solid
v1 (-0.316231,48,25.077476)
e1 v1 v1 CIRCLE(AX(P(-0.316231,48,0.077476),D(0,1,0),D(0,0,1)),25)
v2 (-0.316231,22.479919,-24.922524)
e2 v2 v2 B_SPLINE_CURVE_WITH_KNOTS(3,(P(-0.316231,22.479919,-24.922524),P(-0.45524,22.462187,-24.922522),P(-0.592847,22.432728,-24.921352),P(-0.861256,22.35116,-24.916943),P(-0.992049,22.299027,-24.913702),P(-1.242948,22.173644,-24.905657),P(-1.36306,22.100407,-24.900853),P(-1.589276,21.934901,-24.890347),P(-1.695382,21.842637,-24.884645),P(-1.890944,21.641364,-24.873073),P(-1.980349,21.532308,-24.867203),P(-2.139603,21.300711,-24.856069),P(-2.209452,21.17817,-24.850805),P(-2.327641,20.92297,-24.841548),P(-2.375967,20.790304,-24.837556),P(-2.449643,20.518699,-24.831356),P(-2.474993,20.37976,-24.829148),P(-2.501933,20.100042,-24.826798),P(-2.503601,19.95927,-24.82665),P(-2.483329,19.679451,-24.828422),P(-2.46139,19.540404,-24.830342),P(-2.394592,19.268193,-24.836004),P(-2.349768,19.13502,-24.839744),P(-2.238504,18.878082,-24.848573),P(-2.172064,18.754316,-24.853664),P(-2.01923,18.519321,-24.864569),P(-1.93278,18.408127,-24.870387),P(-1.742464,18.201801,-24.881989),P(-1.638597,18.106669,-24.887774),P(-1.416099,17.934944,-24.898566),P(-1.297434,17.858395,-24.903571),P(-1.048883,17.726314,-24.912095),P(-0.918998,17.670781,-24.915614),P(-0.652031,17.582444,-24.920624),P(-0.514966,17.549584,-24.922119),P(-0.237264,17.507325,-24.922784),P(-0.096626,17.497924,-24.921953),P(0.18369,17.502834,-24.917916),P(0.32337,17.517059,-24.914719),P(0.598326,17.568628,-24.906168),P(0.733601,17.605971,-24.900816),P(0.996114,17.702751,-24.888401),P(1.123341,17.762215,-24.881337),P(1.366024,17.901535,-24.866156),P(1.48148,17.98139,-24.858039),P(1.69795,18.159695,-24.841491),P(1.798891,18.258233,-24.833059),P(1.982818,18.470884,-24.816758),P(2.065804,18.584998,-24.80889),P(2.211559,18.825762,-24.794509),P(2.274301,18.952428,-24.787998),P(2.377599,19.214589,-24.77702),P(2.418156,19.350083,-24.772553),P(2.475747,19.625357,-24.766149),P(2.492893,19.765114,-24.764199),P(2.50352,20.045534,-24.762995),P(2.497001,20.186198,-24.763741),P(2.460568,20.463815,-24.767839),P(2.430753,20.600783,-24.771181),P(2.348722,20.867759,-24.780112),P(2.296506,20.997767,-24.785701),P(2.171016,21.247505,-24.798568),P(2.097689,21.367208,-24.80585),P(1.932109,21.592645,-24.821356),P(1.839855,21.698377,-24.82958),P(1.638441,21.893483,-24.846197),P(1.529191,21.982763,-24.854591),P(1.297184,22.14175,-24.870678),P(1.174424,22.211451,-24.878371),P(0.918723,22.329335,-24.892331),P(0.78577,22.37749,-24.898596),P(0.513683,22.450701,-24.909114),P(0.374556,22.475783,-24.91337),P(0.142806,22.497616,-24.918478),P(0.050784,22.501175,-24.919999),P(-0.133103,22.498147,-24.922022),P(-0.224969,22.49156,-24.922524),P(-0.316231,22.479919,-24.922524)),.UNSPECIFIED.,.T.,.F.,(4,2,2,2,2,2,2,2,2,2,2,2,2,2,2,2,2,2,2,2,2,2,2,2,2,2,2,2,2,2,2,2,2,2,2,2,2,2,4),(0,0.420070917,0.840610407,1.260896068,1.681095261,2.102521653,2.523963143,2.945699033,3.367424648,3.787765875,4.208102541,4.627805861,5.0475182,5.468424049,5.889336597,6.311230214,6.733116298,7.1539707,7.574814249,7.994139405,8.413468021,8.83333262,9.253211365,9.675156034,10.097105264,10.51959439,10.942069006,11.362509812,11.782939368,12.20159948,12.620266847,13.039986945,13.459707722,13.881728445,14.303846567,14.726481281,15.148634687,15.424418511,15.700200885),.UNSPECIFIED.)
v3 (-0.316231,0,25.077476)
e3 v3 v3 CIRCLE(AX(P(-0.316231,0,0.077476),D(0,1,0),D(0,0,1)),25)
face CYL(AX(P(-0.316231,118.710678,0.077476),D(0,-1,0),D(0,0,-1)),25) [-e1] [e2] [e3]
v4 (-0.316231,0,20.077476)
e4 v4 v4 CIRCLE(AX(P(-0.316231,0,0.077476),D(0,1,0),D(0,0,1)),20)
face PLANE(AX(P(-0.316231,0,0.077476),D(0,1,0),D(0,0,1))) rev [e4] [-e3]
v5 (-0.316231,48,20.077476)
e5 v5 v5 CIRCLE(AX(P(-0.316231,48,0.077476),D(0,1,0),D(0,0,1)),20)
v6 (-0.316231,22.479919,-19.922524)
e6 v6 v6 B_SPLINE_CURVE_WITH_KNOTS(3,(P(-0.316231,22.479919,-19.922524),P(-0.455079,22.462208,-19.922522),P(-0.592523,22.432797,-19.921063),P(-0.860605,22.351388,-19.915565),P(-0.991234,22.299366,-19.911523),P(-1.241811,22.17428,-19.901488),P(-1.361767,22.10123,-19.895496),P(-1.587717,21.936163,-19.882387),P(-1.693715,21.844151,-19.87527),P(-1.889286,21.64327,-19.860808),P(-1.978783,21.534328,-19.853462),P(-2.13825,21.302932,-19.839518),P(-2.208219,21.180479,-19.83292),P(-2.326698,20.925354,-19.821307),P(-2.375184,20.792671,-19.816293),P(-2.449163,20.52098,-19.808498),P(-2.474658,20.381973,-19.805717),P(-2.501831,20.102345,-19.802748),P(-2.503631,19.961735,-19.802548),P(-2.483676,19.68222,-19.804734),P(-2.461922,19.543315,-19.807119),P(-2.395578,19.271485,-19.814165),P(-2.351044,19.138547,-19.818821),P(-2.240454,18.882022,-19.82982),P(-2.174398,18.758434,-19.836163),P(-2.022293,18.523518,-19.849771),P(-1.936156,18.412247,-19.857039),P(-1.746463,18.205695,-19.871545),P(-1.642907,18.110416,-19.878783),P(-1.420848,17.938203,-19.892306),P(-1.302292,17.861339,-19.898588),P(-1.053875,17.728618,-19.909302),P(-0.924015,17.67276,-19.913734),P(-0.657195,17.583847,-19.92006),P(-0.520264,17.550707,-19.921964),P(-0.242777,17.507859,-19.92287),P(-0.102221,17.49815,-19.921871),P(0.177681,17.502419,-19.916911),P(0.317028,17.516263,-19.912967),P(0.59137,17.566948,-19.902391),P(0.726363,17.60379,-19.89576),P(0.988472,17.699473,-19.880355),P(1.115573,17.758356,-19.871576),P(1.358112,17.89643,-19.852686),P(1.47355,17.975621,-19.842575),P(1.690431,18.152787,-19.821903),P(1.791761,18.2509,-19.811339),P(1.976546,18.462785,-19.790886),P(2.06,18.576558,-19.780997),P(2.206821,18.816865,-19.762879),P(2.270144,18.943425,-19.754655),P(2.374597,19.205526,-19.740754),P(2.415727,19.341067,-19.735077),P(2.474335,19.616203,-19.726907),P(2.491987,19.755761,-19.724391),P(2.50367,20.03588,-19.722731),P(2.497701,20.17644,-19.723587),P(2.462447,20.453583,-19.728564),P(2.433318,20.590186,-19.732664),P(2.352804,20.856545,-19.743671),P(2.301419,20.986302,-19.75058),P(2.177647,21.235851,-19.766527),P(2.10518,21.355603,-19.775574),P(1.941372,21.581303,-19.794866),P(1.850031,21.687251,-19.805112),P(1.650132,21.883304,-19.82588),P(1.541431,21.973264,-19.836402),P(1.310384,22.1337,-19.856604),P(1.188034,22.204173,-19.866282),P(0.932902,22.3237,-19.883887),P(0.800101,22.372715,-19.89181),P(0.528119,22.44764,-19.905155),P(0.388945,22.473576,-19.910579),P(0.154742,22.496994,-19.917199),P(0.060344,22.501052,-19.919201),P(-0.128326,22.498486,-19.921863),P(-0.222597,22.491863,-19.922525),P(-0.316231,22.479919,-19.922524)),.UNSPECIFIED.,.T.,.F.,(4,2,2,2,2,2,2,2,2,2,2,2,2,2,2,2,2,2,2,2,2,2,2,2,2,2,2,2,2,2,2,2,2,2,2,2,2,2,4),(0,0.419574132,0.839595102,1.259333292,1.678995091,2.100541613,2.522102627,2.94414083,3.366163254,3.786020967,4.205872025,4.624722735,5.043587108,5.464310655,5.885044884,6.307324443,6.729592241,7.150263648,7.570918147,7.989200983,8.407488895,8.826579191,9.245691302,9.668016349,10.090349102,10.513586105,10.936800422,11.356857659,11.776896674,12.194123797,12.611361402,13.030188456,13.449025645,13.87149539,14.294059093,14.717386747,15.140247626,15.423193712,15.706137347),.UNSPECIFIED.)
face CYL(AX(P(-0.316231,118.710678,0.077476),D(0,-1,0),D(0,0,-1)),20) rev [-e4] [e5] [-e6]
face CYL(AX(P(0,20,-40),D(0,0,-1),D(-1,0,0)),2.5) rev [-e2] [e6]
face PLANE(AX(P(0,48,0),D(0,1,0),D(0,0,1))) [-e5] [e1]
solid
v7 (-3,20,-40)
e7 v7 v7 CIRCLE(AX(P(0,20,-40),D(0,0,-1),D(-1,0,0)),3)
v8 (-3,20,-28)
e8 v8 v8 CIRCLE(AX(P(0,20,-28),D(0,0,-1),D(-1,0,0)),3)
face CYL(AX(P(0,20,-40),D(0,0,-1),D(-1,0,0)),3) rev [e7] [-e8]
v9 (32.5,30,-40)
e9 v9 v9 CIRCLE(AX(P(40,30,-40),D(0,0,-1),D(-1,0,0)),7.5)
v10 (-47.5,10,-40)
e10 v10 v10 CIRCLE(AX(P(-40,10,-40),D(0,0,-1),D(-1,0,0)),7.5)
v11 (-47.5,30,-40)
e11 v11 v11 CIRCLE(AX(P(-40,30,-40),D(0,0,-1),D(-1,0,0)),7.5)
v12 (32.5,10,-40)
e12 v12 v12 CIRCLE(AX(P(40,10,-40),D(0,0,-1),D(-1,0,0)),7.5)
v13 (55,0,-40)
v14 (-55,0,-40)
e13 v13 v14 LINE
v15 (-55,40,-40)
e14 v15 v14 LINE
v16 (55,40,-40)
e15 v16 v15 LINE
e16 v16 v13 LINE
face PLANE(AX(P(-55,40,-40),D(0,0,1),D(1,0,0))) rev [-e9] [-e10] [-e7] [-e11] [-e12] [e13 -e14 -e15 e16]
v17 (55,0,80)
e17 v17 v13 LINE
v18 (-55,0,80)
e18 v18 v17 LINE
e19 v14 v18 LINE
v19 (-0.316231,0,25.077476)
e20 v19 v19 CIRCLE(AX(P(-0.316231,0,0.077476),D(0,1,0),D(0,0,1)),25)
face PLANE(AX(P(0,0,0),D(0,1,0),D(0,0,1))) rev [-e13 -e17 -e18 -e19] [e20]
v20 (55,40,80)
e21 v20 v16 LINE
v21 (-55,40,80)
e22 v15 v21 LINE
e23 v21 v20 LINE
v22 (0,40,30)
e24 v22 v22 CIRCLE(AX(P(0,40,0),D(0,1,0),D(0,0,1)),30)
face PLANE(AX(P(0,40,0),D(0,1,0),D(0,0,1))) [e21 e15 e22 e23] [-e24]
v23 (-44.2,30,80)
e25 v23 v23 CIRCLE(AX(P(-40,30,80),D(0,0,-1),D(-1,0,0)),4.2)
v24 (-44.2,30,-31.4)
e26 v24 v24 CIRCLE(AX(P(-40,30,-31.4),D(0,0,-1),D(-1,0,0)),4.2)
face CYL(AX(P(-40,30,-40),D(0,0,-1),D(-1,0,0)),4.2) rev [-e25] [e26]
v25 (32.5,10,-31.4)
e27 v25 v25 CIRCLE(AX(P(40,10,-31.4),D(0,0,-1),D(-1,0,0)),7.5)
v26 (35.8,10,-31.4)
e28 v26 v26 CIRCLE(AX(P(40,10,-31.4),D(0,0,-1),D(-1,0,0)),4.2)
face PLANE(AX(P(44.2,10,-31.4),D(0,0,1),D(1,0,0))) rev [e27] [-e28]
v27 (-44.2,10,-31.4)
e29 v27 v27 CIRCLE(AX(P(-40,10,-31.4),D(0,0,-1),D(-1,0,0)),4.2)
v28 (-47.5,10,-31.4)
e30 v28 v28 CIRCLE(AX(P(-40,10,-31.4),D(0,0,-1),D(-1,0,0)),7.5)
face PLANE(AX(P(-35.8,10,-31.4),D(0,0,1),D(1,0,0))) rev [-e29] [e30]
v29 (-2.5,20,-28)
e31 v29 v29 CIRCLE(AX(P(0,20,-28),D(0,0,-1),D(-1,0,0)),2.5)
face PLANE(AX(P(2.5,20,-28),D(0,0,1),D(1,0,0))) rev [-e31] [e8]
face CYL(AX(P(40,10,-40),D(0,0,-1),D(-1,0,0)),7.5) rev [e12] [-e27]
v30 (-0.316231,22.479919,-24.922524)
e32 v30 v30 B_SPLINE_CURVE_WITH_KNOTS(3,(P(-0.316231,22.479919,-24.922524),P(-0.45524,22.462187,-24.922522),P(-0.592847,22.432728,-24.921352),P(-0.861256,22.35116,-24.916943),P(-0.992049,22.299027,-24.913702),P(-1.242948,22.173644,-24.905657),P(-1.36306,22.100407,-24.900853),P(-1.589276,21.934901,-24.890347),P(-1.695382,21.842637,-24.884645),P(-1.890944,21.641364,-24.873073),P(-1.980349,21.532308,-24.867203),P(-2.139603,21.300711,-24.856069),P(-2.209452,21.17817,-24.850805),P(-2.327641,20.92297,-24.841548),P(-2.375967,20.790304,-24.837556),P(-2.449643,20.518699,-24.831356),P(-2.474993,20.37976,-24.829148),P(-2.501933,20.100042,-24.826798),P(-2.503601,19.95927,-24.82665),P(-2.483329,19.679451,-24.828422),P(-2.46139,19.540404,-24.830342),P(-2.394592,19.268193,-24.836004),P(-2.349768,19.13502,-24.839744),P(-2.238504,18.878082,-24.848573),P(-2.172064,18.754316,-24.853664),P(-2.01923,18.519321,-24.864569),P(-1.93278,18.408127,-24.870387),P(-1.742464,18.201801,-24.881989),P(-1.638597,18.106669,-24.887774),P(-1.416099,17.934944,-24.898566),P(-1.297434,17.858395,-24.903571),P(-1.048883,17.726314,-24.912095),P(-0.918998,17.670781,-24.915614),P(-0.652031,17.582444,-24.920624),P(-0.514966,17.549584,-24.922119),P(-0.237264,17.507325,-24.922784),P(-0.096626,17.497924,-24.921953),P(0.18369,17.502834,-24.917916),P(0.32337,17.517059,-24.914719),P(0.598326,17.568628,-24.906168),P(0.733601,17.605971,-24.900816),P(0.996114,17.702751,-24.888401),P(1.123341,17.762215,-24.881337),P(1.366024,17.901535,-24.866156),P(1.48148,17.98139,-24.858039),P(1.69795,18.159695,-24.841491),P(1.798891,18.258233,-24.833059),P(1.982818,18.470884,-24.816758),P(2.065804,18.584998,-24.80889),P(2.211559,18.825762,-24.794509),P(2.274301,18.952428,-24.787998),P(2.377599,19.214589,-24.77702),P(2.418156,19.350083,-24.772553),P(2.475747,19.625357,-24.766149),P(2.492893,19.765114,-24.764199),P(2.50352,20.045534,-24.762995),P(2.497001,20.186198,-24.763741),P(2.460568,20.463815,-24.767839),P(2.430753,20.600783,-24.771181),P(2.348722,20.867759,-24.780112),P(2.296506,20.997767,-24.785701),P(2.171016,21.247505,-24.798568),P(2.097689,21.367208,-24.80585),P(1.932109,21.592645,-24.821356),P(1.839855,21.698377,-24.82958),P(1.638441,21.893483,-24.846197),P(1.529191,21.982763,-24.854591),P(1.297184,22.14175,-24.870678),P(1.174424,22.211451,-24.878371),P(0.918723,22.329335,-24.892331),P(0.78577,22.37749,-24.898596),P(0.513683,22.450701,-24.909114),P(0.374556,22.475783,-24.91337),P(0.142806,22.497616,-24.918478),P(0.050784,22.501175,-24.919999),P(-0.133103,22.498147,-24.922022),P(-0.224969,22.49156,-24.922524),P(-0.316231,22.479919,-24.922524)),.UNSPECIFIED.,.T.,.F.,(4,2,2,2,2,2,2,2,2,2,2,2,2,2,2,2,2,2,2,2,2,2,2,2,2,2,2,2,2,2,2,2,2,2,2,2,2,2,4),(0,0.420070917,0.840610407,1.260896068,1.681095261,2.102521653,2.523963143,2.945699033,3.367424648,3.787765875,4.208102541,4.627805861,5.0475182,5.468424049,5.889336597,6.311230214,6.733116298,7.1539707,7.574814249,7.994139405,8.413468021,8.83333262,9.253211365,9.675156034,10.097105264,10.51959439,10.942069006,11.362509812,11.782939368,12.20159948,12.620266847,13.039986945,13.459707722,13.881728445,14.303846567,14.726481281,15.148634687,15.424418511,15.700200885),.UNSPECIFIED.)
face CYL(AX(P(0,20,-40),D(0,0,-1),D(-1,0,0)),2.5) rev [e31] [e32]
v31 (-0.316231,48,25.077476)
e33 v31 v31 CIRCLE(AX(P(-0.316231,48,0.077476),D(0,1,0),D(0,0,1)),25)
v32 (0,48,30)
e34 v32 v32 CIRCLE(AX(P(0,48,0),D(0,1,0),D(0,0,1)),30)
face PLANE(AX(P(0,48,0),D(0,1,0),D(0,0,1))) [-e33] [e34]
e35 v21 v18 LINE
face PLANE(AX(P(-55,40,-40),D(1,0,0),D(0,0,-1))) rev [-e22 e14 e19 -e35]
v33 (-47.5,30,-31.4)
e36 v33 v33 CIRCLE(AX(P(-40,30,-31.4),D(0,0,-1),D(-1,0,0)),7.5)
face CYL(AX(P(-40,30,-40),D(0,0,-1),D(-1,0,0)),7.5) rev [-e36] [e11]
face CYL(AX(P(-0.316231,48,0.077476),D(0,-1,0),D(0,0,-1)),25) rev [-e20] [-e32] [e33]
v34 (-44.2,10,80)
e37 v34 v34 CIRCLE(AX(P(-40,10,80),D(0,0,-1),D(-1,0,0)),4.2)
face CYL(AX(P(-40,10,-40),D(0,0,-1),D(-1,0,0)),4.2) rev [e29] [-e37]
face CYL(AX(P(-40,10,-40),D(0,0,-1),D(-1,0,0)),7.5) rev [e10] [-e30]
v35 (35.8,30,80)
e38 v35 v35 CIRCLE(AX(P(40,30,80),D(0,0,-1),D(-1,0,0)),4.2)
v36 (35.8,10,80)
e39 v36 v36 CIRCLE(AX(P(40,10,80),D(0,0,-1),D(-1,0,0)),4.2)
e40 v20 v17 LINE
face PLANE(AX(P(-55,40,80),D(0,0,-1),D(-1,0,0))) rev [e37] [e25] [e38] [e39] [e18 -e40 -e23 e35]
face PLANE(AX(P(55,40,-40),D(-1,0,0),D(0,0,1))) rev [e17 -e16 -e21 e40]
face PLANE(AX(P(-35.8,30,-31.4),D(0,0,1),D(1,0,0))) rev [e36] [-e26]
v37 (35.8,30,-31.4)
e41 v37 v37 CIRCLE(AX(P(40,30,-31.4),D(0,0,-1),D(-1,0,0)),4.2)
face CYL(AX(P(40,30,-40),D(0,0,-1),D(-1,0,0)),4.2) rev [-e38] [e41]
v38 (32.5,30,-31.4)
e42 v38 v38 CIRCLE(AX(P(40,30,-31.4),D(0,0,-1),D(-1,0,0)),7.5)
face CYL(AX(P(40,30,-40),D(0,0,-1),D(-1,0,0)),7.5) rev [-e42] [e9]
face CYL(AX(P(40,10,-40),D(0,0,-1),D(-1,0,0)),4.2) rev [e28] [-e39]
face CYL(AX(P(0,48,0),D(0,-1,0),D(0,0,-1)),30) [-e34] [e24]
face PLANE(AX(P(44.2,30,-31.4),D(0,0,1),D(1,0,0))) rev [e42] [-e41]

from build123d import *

# Parameters (mm, degrees)
SKETCH1_W                                     = 110
SKETCH1_H                                     = 120
GUIDE_BLOCK_DEPTH                             = 40
SKETCH2_R                                     = 30
SKETCH2_R_2                                   = 25
BUSH_BOSS_DEPTH                               = 8
SKETCH3_R                                     = 25
CUT_EXTRUDE1_DEPTH                            = 106
SKETCH8_R                                     = 25
SKETCH8_R_2                                   = 20
BOSS_EXTRUDE3_DEPTH                           = 48
CBORE_START                                   = -40
CBORE_FOR_M8_HEX_SOCKET_HEAD_CAP_SCR_2_R      = 4.2
CBORE_FOR_M8_HEX_SOCKET_HEAD_CAP_SCREW1_DEPTH = 120
CBORE_FOR_M8_HEX_SOCKET_HEAD_CAP_SCR_3_O_R    = 7.5
CBORE_FOR_M8_HEX_SOCKET_HEAD_CAP_SCR_3_O_R_2  = 4.2
CBORE_FOR_M8_HEX_SOCKET_HEAD_CAP_SCR_3_DEPTH  = 8.6


# Read off the part's stored shape, not the designer's step: M6 Tapped Hole1, CBORE for M8 Hex Socket Head Cap Screw1
with BuildPart() as part:
    # Sketch1 → GUIDE_BLOCK (new body)
    with BuildSketch(Plane(origin=(0, 0, 0), x_dir=(1, 0, 0), z_dir=(0, 1, 0))):
        with Locations((0, -20)):
            Rectangle(SKETCH1_W, SKETCH1_H)
    extrude(amount=GUIDE_BLOCK_DEPTH)

    # Sketch2 → BUSH_BOSS (add)
    with BuildSketch(Plane(origin=(0, 40, 0), x_dir=(1, 0, 0), z_dir=(0, 1, 0))):
        with Locations(Location((0, 0, 0), (0, 0, 270))):
            Circle(SKETCH2_R)
        with Locations(Location((-0.316230532, -0.07747648, 0), (0, 0, 270))):
            Circle(SKETCH2_R_2, mode=Mode.SUBTRACT)
    extrude(amount=BUSH_BOSS_DEPTH)

    # Sketch3 → Cut-Extrude1 (cut, through all)
    with BuildSketch(Plane(origin=(0, 40, 0), x_dir=(1, 0, 0), z_dir=(0, 1, 0))):
        with Locations(Location((-0.316230532, -0.07747648, 0), (0, 0, 270))):
            Circle(SKETCH3_R)
    extrude(amount=-CUT_EXTRUDE1_DEPTH, mode=Mode.SUBTRACT)


with BuildPart() as body_2:
    # Sketch8 → Boss-Extrude3 (new body)
    with BuildSketch(Plane(origin=(0, 0, 0), x_dir=(1, 0, 0), z_dir=(0, 1, 0))):
        with Locations(Location((-0.316230532, -0.07747648, 0), (0, 0, 270))):
            Circle(SKETCH8_R)
        with Locations(Location((-0.316230532, -0.07747648, 0), (0, 0, 270))):
            Circle(SKETCH8_R_2, mode=Mode.SUBTRACT)
    extrude(amount=BOSS_EXTRUDE3_DEPTH)


with BuildPart() as m6_tapped_hole1_tool:
    # M6 Tapped Hole1 outline → M6 Tapped Hole1 (revolve)
    with BuildSketch(Plane.XZ.offset(-20)):
        Polygon((2.5, -19.723195432), (0, -19.723195432), (0, -40), (3, -40), (3, -28), (2.5, -28), align=None)
    revolve(axis=Axis((0, 20, 0), (0, 0, 1)))


with BuildPart() as part_1:
    add(part.part)

    # M6 Tapped Hole1: cut by m6_tapped_hole1_tool
    add(m6_tapped_hole1_tool.part, mode=Mode.SUBTRACT)

    # CBORE for M8 Hex Socket Head Cap Scr 2 → CBORE for M8 Hex Socket Head Cap Screw1 (cut)
    with BuildSketch(Plane.XY.offset(CBORE_START)):
        with Locations((-40, 10)):
            Circle(CBORE_FOR_M8_HEX_SOCKET_HEAD_CAP_SCR_2_R)
        with Locations((40, 30)):
            Circle(CBORE_FOR_M8_HEX_SOCKET_HEAD_CAP_SCR_2_R)
        with Locations((-40, 30)):
            Circle(CBORE_FOR_M8_HEX_SOCKET_HEAD_CAP_SCR_2_R)
        with Locations((40, 10)):
            Circle(CBORE_FOR_M8_HEX_SOCKET_HEAD_CAP_SCR_2_R)
    extrude(amount=CBORE_FOR_M8_HEX_SOCKET_HEAD_CAP_SCREW1_DEPTH, mode=Mode.SUBTRACT)

    # CBORE for M8 Hex Socket Head Cap Scr 3 o → CBORE for M8 Hex Socket Head Cap Scr 3 (cut)
    # profile 1 of 4: a face of its own
    with BuildSketch(Plane.XY.offset(CBORE_START)):
        with Locations((-40, 10)):
            Circle(CBORE_FOR_M8_HEX_SOCKET_HEAD_CAP_SCR_3_O_R)
        with Locations((-40, 10)):
            Circle(CBORE_FOR_M8_HEX_SOCKET_HEAD_CAP_SCR_3_O_R_2, mode=Mode.SUBTRACT)
    # profile 2 of 4: a face of its own
    with BuildSketch(Plane.XY.offset(CBORE_START)):
        with Locations((40, 30)):
            Circle(CBORE_FOR_M8_HEX_SOCKET_HEAD_CAP_SCR_3_O_R)
        with Locations((40, 30)):
            Circle(CBORE_FOR_M8_HEX_SOCKET_HEAD_CAP_SCR_3_O_R_2, mode=Mode.SUBTRACT)
    # profile 3 of 4: a face of its own
    with BuildSketch(Plane.XY.offset(CBORE_START)):
        with Locations((-40, 30)):
            Circle(CBORE_FOR_M8_HEX_SOCKET_HEAD_CAP_SCR_3_O_R)
        with Locations((-40, 30)):
            Circle(CBORE_FOR_M8_HEX_SOCKET_HEAD_CAP_SCR_3_O_R_2, mode=Mode.SUBTRACT)
    # profile 4 of 4: a face of its own
    with BuildSketch(Plane.XY.offset(CBORE_START)):
        with Locations((40, 10)):
            Circle(CBORE_FOR_M8_HEX_SOCKET_HEAD_CAP_SCR_3_O_R)
        with Locations((40, 10)):
            Circle(CBORE_FOR_M8_HEX_SOCKET_HEAD_CAP_SCR_3_O_R_2, mode=Mode.SUBTRACT)
    extrude(amount=CBORE_FOR_M8_HEX_SOCKET_HEAD_CAP_SCR_3_DEPTH, mode=Mode.SUBTRACT)


with BuildPart() as body_2_1:
    add(body_2.part)

    # M6 Tapped Hole1: cut by m6_tapped_hole1_tool
    add(m6_tapped_hole1_tool.part, mode=Mode.SUBTRACT)


solid = Compound([part_1.part, body_2_1.part])
